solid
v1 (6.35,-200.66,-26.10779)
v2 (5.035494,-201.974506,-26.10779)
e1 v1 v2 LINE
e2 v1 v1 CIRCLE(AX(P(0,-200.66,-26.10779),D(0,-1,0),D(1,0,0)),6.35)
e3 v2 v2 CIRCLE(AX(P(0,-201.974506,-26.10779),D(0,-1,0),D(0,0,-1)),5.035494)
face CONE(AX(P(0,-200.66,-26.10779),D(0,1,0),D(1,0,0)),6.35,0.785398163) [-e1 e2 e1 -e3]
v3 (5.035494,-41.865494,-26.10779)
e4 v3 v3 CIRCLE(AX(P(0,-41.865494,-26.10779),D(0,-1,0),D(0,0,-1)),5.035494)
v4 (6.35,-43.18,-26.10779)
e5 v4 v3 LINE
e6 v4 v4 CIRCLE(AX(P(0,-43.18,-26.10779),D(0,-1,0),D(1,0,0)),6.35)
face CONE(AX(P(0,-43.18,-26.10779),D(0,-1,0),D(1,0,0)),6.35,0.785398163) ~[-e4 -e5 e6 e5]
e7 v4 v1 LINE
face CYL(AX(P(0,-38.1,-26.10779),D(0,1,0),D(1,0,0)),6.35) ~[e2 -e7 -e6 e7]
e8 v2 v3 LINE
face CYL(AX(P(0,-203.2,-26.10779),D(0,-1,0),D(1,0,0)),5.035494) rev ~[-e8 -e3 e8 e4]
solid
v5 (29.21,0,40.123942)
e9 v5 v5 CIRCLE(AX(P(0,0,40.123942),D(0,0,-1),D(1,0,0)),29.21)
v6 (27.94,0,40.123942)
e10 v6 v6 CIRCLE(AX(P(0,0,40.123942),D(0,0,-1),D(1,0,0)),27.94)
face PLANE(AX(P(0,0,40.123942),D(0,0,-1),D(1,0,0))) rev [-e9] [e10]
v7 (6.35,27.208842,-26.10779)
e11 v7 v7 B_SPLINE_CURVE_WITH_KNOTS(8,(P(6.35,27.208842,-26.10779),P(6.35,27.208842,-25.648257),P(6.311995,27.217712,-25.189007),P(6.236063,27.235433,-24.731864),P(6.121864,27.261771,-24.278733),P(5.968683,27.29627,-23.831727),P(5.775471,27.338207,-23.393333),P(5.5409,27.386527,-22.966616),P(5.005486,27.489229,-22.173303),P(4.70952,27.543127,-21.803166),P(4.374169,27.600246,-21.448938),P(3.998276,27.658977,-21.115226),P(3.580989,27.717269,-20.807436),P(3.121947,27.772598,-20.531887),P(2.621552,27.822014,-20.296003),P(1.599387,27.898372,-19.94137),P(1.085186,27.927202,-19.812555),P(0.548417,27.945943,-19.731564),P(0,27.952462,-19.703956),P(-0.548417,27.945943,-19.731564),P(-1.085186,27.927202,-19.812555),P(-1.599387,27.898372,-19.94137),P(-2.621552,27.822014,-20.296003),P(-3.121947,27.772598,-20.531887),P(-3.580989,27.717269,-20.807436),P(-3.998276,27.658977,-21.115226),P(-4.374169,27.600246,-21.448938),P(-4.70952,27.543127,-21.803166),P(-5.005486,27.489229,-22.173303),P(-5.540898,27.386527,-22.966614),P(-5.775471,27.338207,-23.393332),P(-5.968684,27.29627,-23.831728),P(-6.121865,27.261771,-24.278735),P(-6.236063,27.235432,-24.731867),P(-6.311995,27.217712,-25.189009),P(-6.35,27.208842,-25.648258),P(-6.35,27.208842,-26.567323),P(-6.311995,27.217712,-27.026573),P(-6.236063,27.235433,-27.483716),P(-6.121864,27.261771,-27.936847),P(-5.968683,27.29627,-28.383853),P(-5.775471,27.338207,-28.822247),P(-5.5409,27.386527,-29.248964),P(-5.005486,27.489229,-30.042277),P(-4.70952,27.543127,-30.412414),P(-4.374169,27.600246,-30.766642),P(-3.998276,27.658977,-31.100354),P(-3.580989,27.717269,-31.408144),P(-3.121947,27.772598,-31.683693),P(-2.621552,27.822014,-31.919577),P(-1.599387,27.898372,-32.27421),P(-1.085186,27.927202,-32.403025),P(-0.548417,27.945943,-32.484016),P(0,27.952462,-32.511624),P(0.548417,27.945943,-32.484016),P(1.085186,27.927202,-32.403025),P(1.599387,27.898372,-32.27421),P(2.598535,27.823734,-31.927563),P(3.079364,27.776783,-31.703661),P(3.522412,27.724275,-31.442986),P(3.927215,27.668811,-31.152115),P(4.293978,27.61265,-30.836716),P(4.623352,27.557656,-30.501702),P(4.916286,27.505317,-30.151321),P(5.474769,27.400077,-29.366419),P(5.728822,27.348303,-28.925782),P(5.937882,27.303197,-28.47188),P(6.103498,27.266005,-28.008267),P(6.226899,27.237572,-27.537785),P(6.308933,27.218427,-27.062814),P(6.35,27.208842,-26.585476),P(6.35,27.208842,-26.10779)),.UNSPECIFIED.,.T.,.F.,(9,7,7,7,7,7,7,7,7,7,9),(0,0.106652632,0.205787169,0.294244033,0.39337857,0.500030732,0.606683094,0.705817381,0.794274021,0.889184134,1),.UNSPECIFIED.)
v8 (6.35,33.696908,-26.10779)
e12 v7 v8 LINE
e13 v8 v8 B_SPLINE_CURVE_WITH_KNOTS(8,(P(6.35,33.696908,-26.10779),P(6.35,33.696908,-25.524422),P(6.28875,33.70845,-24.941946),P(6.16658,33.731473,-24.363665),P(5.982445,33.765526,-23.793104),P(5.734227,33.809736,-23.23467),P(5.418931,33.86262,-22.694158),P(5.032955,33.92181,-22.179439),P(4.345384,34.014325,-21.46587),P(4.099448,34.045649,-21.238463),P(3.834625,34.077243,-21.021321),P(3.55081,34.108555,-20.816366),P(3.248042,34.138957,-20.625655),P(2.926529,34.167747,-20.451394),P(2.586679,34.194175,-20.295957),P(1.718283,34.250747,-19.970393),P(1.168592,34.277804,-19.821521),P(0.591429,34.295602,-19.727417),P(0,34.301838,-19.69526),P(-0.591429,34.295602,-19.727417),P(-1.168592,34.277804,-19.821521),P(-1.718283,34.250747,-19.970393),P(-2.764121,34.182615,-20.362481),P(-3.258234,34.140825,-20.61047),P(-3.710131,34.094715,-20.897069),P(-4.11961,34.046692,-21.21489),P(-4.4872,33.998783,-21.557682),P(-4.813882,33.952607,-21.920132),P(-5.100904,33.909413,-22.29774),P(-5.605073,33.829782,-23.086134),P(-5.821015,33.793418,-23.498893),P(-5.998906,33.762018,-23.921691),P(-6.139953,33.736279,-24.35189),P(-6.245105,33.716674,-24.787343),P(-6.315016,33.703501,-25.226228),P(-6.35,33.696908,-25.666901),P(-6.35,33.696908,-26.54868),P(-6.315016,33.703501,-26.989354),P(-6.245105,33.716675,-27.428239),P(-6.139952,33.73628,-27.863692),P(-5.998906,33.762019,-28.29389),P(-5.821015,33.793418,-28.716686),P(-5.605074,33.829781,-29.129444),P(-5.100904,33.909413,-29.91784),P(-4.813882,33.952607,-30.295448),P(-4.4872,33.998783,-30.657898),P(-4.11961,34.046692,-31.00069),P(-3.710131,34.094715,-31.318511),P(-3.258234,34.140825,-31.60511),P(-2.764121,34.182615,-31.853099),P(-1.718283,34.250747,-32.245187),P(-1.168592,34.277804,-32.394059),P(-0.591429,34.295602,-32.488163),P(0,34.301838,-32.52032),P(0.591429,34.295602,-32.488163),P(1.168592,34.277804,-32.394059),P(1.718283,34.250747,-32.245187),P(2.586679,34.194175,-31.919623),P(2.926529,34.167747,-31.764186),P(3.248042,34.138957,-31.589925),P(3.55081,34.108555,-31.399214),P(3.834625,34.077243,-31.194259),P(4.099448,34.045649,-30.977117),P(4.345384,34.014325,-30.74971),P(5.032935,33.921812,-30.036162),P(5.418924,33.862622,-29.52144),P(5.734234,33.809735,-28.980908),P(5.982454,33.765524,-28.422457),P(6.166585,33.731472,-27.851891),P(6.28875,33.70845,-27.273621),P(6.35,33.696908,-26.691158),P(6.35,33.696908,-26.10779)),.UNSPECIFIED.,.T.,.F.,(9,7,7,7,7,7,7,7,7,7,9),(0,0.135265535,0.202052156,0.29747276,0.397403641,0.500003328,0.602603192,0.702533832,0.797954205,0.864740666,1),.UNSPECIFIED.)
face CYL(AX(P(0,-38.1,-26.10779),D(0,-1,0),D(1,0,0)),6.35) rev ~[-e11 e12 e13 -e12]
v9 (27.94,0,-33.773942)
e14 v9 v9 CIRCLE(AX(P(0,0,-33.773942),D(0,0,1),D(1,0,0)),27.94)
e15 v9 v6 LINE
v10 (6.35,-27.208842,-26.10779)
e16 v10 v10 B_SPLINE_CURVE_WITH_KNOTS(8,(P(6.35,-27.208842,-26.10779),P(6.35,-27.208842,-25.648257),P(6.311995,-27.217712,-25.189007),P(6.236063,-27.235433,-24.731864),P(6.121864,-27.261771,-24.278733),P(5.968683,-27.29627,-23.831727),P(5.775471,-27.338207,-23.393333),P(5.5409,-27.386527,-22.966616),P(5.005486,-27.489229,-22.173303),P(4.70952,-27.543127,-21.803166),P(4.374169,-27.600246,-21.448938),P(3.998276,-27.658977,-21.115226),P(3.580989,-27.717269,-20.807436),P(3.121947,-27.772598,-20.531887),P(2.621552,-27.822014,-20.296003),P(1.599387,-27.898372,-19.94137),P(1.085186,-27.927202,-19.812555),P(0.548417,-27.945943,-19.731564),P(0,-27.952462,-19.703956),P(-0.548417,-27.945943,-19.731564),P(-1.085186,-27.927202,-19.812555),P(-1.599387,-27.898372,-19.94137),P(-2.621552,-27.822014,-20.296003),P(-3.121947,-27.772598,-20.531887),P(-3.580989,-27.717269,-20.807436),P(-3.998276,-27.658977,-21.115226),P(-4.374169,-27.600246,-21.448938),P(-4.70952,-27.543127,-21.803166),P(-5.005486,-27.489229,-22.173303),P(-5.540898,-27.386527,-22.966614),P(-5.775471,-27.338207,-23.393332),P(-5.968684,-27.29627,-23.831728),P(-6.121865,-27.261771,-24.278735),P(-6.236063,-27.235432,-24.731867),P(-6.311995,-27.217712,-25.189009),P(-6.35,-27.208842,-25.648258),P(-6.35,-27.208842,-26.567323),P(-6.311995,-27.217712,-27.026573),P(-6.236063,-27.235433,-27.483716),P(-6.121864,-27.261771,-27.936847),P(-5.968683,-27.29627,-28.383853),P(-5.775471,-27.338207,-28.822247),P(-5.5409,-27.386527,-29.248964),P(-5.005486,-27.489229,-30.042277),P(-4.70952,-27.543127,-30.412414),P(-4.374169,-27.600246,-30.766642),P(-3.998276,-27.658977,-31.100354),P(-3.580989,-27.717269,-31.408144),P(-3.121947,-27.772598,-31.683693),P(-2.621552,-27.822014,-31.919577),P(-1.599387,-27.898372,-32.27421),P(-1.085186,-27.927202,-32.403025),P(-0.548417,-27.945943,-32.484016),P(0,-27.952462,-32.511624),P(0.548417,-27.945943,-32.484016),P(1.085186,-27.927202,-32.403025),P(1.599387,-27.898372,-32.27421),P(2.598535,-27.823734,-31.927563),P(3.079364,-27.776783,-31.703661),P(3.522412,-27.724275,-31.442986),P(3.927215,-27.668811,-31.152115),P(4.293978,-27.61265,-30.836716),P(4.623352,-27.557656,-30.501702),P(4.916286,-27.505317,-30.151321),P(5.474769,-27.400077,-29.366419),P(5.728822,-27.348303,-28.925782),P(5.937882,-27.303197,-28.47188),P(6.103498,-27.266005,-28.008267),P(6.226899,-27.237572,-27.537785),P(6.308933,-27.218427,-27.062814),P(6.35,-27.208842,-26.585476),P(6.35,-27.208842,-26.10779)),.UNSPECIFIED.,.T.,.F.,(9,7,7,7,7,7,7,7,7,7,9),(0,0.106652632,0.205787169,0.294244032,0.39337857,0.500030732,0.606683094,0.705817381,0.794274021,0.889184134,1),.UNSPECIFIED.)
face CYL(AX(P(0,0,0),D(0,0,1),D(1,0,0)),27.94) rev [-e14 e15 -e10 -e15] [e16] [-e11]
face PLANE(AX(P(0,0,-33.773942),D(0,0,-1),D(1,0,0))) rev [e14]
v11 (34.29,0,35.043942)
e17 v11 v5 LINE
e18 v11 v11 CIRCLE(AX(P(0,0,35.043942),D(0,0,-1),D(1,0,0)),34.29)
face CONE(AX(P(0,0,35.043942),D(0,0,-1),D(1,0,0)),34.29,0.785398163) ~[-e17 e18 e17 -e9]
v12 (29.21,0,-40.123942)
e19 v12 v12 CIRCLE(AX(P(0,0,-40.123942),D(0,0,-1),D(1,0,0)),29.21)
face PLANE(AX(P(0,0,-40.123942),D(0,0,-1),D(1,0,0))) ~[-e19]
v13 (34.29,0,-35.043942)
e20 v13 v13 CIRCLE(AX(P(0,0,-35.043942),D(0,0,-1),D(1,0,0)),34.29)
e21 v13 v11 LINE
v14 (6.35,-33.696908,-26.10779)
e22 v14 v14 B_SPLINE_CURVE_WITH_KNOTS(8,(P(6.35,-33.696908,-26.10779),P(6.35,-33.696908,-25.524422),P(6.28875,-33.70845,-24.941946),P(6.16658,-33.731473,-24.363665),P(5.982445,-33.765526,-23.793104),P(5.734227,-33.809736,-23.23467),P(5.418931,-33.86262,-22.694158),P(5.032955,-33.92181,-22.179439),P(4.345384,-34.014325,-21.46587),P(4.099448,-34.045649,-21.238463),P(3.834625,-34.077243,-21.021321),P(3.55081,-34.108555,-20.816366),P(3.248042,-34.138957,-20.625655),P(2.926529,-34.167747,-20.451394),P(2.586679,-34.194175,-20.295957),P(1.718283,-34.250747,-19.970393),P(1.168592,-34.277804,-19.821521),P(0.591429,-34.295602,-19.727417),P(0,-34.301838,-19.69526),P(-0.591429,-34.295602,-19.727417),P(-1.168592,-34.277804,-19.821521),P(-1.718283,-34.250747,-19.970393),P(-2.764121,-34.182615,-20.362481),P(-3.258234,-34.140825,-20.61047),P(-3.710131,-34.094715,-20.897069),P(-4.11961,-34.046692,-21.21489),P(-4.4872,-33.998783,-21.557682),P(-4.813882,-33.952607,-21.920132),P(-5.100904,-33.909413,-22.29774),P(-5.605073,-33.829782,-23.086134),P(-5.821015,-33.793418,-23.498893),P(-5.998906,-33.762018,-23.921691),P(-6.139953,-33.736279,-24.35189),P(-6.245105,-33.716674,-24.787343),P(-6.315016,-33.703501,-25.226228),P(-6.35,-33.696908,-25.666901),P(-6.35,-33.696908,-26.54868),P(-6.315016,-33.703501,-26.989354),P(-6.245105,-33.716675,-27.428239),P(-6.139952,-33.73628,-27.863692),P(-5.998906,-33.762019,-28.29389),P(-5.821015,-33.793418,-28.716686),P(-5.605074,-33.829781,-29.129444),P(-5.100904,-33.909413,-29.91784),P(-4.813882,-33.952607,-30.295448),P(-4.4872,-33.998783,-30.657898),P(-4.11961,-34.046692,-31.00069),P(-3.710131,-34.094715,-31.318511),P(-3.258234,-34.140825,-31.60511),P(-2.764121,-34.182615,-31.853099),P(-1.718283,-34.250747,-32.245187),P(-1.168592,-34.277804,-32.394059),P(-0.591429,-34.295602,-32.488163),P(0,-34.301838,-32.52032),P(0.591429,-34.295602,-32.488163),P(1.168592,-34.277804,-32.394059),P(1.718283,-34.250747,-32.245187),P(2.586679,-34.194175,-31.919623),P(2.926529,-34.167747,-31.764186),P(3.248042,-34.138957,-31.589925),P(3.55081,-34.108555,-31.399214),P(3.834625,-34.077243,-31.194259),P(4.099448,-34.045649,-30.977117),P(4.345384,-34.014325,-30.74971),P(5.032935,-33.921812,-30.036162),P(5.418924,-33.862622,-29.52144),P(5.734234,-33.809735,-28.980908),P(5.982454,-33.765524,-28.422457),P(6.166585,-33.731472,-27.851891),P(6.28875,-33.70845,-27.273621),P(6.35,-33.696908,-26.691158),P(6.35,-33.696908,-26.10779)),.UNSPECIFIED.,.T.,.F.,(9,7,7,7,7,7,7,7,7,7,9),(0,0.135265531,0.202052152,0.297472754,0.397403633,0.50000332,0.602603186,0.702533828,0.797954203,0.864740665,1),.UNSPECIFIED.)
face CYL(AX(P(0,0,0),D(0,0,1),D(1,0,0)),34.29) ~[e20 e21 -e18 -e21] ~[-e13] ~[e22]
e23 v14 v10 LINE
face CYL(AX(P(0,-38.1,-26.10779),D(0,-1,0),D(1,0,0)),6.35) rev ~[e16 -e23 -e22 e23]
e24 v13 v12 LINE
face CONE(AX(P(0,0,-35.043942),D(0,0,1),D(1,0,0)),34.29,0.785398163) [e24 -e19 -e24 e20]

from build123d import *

# Parameters (mm, degrees)
F0_W      = 34.29
F0_H      = 80.2478848061
F5_T      = -6.35
F4_R      = 6.35
F6_DEPTH  = 165.1
F12_R     = 6.35
F7_DEPTH  = 165.1
F8_R      = 5.0354944202
F13_DEPTH = 237.491
F14_DEPTH = 72.3910001
F16_SIZE  = 5.08
F11_SIZE  = 5.08


# Not quite as in the source:
# - a fillet or chamfer that OpenCascade refuses, or shapes differently, is made with other operations: its cross-section is extruded or revolved along the edge and cut away or added


with BuildPart() as f2:
    # F0 (on Front) → F2 (revolve)
    with BuildSketch(Plane.XZ):
        with Locations((17.145, 0)):
            Rectangle(F0_W, F0_H)
    revolve(axis=Axis((0, 0, -6.2726922333), (0, 0, -1)))

    # F5
    f5_openings = [f2.faces().sort_by_distance(p)[0] for p in [
        (0, 0, 40.123942),
    ]]
    offset(amount=F5_T, openings=f5_openings)


with BuildPart() as f6:
    # F4 (on offset) → F6 (new body)
    with BuildSketch(Plane.XZ.offset(38.1)):
        with Locations((0, -12.0859783907)):
            Circle(F4_R)
    extrude(amount=F6_DEPTH)


with BuildPart() as f7:
    # F12 (on offset) → F7 (new body)
    with BuildSketch(Plane.XZ.offset(38.1)):
        with Locations((0, -26.1077899699)):
            Circle(F12_R)
    extrude(amount=F7_DEPTH)


with BuildPart() as f13_tool:
    # F8 (on face) → F13 (new body, through all)
    with BuildSketch(Plane.XZ.offset(203.2)):
        with Locations((0, -26.1077899699)):
            Circle(F8_R)
    extrude(amount=-F13_DEPTH)


with BuildPart() as f2_1:
    add(f2.part)

    # F13: cut by f13_tool
    add(f13_tool.part, mode=Mode.SUBTRACT)

    # F12 (on offset) → F14 (cut, through all)
    with BuildSketch(Plane.XZ.offset(38.1)):
        with Locations((0, -26.1077899699)):
            Circle(F12_R)
    extrude(amount=-F14_DEPTH, mode=Mode.SUBTRACT)

    # F16
    f16_edges = [f2_1.edges().sort_by_distance(p)[0] for p in [
        (-34.29, 0, 40.123942),
    ]]
    chamfer(f16_edges, length=F16_SIZE)

    # F11
    f11_edges = [f2_1.edges().sort_by_distance(p)[0] for p in [
        (-34.29, 0, -40.123942),
    ]]
    chamfer(f11_edges, length=F11_SIZE)


with BuildPart() as f7_1:
    add(f7.part)

    # F13: cut by f13_tool
    add(f13_tool.part, mode=Mode.SUBTRACT)

    # F10: chamfer of 2.54 on 1 edges, made by hand

    # F10_s1 → F10_t2 (revolve, cut)
    with BuildSketch(Plane.XY.offset(-26.1077899699)):
        Polygon((6.35, -200.66), (3.81, -203.2), (6.35, -203.2), align=None)
    revolve(axis=Axis((0, -203.2, -26.1077899699), (0, -1, 0)), mode=Mode.SUBTRACT)

    # F15: chamfer of 5.08 on 1 edges, made by hand

    # F15_s1 → F15_t2 (revolve, cut)
    with BuildSketch(Plane.XY.offset(-26.1077899699)):
        Polygon((6.35, -43.18), (1.27, -38.1), (6.35, -38.1), align=None)
    revolve(axis=Axis((0, -38.1, -26.1077899699), (0, -1, 0)), mode=Mode.SUBTRACT)


solid = Compound([f2_1.part, f7_1.part])
